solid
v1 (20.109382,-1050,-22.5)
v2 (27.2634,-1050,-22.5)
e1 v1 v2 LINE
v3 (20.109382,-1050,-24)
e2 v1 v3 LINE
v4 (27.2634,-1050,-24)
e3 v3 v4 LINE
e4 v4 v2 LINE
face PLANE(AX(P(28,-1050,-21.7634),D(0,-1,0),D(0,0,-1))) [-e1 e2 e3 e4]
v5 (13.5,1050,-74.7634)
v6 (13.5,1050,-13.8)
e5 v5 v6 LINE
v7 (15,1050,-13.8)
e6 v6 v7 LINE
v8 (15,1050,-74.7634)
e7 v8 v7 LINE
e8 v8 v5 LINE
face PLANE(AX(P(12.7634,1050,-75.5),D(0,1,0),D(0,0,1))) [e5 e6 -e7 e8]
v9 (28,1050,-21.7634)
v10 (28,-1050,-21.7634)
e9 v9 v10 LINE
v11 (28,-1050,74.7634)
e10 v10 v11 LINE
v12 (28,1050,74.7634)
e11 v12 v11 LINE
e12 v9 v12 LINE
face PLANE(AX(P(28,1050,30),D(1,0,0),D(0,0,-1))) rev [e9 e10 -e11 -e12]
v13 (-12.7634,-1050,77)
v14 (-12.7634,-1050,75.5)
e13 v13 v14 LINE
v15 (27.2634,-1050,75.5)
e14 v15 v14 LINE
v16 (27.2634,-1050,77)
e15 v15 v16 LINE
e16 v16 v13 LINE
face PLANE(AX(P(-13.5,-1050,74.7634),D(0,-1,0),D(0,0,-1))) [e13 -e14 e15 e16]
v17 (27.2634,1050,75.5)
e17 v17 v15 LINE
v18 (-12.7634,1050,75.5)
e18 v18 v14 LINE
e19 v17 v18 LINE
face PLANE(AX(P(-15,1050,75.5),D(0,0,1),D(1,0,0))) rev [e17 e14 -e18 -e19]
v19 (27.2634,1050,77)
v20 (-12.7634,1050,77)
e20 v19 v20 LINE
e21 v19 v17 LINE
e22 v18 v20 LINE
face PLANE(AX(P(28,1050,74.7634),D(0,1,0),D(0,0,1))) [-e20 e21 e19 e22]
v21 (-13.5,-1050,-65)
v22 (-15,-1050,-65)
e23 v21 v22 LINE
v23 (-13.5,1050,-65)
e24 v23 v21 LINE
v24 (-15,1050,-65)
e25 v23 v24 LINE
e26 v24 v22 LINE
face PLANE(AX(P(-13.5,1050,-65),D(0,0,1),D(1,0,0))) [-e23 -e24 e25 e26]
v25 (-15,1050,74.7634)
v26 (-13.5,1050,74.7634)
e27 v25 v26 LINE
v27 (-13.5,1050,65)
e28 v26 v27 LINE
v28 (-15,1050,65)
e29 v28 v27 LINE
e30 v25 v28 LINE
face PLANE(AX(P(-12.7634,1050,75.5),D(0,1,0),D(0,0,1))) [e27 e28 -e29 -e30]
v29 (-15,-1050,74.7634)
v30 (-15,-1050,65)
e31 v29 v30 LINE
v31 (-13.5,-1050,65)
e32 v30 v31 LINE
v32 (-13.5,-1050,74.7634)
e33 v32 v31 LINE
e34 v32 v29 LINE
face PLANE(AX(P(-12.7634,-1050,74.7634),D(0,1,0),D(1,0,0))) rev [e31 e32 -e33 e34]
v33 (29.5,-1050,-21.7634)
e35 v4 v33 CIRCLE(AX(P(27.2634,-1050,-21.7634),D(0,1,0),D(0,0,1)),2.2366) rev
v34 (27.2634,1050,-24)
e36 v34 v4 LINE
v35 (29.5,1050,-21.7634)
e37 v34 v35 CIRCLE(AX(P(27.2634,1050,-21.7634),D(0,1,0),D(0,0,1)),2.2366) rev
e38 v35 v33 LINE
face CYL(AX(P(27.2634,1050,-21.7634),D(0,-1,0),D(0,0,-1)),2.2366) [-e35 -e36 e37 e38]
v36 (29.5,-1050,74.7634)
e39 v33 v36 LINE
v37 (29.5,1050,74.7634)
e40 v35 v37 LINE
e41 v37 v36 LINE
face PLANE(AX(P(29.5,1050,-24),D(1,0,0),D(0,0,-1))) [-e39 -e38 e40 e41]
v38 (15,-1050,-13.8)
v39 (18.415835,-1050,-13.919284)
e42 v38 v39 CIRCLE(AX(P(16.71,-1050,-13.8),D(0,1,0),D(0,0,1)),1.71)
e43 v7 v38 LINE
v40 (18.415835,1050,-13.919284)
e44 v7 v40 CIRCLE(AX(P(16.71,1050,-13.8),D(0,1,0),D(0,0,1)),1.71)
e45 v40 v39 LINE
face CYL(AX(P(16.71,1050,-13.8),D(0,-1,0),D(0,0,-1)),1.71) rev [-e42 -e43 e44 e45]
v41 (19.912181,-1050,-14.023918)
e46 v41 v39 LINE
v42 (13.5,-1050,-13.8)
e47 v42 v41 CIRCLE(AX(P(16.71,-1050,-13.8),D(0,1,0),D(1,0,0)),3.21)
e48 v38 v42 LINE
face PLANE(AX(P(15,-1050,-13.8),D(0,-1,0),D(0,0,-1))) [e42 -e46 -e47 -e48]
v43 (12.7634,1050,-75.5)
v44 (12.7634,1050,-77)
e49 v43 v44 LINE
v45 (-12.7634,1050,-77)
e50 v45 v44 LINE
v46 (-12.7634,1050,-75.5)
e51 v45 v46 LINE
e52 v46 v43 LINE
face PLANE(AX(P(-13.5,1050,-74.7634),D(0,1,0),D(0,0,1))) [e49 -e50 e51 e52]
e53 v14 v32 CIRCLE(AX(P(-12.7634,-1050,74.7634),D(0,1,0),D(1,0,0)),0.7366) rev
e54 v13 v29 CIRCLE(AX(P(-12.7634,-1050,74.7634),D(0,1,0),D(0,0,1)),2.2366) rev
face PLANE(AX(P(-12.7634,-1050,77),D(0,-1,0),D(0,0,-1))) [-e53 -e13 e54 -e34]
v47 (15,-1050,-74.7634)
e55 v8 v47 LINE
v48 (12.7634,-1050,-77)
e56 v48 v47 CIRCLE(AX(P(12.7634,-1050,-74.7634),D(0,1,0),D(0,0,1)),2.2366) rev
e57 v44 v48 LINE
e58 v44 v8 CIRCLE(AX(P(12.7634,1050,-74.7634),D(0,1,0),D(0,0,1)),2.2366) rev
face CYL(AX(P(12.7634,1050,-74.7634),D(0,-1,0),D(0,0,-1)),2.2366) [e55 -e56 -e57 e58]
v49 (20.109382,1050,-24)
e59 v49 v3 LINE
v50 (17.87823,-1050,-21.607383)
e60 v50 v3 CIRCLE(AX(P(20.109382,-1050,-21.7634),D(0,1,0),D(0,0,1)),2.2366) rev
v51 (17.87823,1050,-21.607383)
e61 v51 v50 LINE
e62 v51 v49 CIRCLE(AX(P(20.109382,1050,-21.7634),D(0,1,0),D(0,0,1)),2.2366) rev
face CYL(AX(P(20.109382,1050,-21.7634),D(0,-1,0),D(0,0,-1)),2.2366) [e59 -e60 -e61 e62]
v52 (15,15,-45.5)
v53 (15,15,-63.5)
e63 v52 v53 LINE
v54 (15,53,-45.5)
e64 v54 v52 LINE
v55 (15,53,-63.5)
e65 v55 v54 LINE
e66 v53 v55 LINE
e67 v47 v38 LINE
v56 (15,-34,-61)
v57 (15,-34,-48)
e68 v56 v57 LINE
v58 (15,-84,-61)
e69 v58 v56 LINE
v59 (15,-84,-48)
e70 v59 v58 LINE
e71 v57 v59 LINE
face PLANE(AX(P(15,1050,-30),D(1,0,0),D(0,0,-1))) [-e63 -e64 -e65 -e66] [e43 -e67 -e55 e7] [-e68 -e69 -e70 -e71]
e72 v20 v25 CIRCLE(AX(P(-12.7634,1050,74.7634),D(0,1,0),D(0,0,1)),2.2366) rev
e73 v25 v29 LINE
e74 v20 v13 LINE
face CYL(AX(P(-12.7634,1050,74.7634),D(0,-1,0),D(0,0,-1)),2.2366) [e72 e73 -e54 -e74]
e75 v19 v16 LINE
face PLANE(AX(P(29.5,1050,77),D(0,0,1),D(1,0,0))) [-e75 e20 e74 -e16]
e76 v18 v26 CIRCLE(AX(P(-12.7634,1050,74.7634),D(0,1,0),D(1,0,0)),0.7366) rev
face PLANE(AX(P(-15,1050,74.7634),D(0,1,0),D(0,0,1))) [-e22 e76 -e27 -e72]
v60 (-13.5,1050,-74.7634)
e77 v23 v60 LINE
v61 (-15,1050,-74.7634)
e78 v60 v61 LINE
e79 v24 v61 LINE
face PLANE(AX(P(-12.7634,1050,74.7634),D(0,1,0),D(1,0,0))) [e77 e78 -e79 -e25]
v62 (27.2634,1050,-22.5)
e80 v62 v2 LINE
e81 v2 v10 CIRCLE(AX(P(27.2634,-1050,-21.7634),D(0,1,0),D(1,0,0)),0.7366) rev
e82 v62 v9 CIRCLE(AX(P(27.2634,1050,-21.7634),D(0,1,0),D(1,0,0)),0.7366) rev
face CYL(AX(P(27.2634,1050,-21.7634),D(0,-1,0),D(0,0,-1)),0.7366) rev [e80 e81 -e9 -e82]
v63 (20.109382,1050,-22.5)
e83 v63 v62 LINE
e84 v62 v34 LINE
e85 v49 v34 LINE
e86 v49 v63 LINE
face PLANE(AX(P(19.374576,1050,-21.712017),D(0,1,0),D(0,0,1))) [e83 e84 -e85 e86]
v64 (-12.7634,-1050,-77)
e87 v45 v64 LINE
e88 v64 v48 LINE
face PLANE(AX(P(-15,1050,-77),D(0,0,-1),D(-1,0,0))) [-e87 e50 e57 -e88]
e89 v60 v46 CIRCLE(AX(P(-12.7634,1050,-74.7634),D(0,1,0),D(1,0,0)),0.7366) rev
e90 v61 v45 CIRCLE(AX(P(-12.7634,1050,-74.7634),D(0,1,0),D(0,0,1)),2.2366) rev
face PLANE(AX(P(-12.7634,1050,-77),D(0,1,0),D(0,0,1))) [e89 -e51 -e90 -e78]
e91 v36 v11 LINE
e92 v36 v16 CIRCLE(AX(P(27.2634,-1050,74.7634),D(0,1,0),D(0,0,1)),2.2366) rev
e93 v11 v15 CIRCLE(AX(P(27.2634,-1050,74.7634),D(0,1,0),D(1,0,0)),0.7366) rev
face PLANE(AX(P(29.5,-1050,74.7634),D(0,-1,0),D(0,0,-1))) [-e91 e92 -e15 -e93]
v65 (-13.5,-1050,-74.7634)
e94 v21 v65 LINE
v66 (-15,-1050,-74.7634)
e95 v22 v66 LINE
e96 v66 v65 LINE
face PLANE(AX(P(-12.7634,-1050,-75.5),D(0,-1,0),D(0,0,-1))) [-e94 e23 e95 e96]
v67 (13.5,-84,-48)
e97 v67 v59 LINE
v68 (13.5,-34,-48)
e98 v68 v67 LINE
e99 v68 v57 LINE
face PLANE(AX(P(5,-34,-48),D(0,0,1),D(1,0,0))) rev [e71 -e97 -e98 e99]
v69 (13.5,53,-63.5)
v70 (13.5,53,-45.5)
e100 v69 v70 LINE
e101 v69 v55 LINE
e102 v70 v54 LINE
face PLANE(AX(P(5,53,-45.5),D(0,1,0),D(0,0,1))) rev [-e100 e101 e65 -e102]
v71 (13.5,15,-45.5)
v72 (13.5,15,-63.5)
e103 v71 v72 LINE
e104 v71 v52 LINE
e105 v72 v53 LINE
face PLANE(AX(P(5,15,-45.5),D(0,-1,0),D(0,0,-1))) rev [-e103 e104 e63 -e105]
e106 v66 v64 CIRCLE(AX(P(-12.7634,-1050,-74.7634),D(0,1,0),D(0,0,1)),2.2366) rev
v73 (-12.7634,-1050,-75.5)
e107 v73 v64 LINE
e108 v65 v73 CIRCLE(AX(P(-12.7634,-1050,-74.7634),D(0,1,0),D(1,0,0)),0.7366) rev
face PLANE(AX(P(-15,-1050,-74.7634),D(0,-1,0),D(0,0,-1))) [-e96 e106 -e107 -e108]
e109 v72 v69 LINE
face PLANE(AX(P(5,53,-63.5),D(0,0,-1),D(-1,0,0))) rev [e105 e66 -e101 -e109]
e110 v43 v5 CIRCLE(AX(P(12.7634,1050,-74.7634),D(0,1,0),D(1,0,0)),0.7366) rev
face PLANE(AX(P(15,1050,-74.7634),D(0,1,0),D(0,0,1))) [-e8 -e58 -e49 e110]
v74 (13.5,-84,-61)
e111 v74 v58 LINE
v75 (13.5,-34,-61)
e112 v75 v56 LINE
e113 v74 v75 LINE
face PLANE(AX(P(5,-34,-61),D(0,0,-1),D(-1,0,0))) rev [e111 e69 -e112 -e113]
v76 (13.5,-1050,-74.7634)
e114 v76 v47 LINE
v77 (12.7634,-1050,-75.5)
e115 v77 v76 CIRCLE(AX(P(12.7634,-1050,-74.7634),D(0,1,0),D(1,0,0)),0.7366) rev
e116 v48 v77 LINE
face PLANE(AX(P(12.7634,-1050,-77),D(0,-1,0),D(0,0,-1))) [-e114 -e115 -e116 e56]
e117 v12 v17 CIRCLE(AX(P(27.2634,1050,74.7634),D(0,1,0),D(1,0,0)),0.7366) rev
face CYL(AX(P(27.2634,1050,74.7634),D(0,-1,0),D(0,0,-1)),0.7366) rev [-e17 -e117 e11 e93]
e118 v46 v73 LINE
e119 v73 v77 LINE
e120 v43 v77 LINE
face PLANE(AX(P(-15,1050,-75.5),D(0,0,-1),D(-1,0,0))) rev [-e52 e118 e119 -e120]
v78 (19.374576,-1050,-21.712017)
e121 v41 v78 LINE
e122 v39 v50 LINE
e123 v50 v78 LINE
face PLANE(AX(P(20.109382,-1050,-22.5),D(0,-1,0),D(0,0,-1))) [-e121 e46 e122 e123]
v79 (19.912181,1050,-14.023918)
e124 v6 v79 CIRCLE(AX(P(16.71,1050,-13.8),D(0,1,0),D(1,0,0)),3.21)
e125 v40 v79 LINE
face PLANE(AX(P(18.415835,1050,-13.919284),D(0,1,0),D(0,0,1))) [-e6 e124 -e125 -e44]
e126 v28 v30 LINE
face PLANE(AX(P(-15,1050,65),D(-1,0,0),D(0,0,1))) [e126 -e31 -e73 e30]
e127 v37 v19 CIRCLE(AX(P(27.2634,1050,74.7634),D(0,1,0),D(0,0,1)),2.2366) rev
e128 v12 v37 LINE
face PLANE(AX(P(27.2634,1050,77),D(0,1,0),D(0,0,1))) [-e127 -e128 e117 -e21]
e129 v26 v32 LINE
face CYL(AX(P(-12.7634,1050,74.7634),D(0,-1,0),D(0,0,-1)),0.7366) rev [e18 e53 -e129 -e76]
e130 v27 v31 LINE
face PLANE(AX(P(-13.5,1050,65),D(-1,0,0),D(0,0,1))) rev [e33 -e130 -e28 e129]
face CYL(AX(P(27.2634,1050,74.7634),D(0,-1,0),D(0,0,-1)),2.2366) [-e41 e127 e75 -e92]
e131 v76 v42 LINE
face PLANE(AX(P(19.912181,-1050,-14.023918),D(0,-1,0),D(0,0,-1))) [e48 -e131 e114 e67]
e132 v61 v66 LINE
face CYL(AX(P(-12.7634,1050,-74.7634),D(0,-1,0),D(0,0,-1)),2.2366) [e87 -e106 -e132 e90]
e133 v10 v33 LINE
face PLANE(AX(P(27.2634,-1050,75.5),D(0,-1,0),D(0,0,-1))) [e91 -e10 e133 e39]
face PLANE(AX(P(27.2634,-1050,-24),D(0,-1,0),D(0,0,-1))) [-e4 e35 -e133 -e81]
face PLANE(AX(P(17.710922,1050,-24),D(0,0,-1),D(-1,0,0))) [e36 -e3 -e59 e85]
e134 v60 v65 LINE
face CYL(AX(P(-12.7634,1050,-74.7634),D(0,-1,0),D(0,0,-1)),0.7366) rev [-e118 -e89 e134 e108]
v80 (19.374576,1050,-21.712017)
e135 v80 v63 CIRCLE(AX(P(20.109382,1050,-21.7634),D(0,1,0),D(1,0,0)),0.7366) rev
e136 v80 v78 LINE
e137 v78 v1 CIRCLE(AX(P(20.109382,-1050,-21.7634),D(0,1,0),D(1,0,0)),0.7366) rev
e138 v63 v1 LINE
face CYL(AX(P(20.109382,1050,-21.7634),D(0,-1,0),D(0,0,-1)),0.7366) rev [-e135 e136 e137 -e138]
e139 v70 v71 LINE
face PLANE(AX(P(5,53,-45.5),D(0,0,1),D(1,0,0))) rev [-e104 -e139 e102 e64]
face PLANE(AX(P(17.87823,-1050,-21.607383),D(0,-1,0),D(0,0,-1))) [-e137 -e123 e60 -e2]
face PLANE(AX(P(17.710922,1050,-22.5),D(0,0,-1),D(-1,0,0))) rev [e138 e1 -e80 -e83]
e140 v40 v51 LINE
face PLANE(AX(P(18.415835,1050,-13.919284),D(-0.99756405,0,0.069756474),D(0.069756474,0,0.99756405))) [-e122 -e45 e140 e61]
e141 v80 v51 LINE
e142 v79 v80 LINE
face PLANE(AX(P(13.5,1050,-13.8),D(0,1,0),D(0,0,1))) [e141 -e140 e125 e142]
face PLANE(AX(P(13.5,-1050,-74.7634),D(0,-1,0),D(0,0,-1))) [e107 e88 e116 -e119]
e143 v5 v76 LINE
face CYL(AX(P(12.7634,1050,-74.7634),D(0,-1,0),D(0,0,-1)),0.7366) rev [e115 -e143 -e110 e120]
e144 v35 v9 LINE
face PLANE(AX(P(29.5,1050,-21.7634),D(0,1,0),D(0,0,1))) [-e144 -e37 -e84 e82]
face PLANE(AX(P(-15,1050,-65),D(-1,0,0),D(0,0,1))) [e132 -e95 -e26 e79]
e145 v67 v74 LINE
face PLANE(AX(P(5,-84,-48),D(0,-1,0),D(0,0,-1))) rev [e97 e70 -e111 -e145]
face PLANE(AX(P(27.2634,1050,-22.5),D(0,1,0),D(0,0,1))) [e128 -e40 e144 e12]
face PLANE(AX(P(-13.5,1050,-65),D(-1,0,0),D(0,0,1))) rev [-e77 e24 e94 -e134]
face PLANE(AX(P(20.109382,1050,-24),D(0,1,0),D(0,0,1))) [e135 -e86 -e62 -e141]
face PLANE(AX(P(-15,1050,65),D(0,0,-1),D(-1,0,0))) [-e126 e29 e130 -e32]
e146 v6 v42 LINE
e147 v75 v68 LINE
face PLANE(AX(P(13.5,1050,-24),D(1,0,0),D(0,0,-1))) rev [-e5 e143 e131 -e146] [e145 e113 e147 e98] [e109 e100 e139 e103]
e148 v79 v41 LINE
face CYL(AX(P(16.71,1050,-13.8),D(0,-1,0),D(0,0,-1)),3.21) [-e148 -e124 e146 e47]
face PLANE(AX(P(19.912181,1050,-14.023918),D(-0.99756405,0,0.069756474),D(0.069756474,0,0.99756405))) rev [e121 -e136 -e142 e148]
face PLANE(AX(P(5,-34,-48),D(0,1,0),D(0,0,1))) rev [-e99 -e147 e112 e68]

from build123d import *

# Parameters (mm, degrees)
BASE_FLANGE1_DEPTH = 1050
SKETCH2_W          = 18
SKETCH2_H          = 38
SKETCH2_W_2        = 13
SKETCH2_H_2        = 50
CUT_EXTRUDE1_DEPTH = 10


# Sheet-metal steps are written as plain solids
with BuildPart() as part:
    # Sketch1 → Base-Flange1 (new, symmetric)
    with BuildSketch(Plane(origin=(0, 0, 0), x_dir=(1, 0, 0), z_dir=(0, 1, 0))):
        with BuildLine():
            Line((-15, 65), (-15, 74.7634))
            ThreePointArc((-15, 74.7634), (-14.344915027, 76.344915027), (-12.7634, 77))
            Line((-12.7634, 77), (12.7634, 77))
            ThreePointArc((12.7634, 77), (14.344915027, 76.344915027), (15, 74.7634))
            Line((15, 74.7634), (15, 30))
            Line((15, 30), (15, 24))
            Line((15, 24), (15, 13.8))
            ThreePointArc((15, 13.8), (16.769678139, 12.091041686), (18.415834526, 13.91928357))
            Line((18.415834526, 13.91928357), (17.878230266, 21.607382671))
            ThreePointArc((17.878230266, 21.607382671), (18.473636332, 23.288757532), (20.109382021, 24))
            Line((20.109382021, 24), (27.2634, 24))
            ThreePointArc((27.2634, 24), (28.844915027, 23.344915027), (29.5, 21.7634))
            Line((29.5, 21.7634), (29.5, -30))
            Line((29.5, -30), (29.5, -74.7634))
            ThreePointArc((29.5, -74.7634), (28.844915027, -76.344915027), (27.2634, -77))
            Line((27.2634, -77), (15, -77))
            Line((15, -77), (-12.7634, -77))
            ThreePointArc((-12.7634, -77), (-14.344915027, -76.344915027), (-15, -74.7634))
            Line((-15, -74.7634), (-15, -65))
            Line((-15, -65), (-13.5, -65))
            Line((-13.5, -65), (-13.5, -74.7634))
            ThreePointArc((-13.5, -74.7634), (-13.284254855, -75.284254855), (-12.7634, -75.5))
            Line((-12.7634, -75.5), (15, -75.5))
            Line((15, -75.5), (27.2634, -75.5))
            ThreePointArc((27.2634, -75.5), (27.784254855, -75.284254855), (28, -74.7634))
            Line((28, -74.7634), (28, -30))
            Line((28, -30), (28, 21.7634))
            ThreePointArc((28, 21.7634), (27.784254855, 22.284254855), (27.2634, 22.5))
            Line((27.2634, 22.5), (20.109382021, 22.5))
            ThreePointArc((20.109382021, 22.5), (19.570666884, 22.265759992), (19.374576341, 21.712017381))
            Line((19.374576341, 21.712017381), (19.912180601, 14.023918281))
            ThreePointArc((19.912180601, 14.023918281), (16.822027384, 10.591955445), (13.5, 13.8))
            Line((13.5, 13.8), (13.5, 24))
            Line((13.5, 24), (13.5, 30))
            Line((13.5, 30), (13.5, 74.7634))
            ThreePointArc((13.5, 74.7634), (13.284254855, 75.284254855), (12.7634, 75.5))
            Line((12.7634, 75.5), (-12.7634, 75.5))
            ThreePointArc((-12.7634, 75.5), (-13.284254855, 75.284254855), (-13.5, 74.7634))
            Line((-13.5, 74.7634), (-13.5, 65))
            Line((-13.5, 65), (-15, 65))
        make_face()
    extrude(amount=BASE_FLANGE1_DEPTH, both=True)

    # Sketch2 → Cut-Extrude1 (cut)
    with BuildSketch(Plane(origin=(15, 0, 0), x_dir=(0, 0, -1), z_dir=(1, 0, 0))):
        with Locations((54.5, 34)):
            Rectangle(SKETCH2_W, SKETCH2_H)
        with Locations((54.5, -59)):
            Rectangle(SKETCH2_W_2, SKETCH2_H_2)
    extrude(amount=-CUT_EXTRUDE1_DEPTH, mode=Mode.SUBTRACT)


solid = part.part
